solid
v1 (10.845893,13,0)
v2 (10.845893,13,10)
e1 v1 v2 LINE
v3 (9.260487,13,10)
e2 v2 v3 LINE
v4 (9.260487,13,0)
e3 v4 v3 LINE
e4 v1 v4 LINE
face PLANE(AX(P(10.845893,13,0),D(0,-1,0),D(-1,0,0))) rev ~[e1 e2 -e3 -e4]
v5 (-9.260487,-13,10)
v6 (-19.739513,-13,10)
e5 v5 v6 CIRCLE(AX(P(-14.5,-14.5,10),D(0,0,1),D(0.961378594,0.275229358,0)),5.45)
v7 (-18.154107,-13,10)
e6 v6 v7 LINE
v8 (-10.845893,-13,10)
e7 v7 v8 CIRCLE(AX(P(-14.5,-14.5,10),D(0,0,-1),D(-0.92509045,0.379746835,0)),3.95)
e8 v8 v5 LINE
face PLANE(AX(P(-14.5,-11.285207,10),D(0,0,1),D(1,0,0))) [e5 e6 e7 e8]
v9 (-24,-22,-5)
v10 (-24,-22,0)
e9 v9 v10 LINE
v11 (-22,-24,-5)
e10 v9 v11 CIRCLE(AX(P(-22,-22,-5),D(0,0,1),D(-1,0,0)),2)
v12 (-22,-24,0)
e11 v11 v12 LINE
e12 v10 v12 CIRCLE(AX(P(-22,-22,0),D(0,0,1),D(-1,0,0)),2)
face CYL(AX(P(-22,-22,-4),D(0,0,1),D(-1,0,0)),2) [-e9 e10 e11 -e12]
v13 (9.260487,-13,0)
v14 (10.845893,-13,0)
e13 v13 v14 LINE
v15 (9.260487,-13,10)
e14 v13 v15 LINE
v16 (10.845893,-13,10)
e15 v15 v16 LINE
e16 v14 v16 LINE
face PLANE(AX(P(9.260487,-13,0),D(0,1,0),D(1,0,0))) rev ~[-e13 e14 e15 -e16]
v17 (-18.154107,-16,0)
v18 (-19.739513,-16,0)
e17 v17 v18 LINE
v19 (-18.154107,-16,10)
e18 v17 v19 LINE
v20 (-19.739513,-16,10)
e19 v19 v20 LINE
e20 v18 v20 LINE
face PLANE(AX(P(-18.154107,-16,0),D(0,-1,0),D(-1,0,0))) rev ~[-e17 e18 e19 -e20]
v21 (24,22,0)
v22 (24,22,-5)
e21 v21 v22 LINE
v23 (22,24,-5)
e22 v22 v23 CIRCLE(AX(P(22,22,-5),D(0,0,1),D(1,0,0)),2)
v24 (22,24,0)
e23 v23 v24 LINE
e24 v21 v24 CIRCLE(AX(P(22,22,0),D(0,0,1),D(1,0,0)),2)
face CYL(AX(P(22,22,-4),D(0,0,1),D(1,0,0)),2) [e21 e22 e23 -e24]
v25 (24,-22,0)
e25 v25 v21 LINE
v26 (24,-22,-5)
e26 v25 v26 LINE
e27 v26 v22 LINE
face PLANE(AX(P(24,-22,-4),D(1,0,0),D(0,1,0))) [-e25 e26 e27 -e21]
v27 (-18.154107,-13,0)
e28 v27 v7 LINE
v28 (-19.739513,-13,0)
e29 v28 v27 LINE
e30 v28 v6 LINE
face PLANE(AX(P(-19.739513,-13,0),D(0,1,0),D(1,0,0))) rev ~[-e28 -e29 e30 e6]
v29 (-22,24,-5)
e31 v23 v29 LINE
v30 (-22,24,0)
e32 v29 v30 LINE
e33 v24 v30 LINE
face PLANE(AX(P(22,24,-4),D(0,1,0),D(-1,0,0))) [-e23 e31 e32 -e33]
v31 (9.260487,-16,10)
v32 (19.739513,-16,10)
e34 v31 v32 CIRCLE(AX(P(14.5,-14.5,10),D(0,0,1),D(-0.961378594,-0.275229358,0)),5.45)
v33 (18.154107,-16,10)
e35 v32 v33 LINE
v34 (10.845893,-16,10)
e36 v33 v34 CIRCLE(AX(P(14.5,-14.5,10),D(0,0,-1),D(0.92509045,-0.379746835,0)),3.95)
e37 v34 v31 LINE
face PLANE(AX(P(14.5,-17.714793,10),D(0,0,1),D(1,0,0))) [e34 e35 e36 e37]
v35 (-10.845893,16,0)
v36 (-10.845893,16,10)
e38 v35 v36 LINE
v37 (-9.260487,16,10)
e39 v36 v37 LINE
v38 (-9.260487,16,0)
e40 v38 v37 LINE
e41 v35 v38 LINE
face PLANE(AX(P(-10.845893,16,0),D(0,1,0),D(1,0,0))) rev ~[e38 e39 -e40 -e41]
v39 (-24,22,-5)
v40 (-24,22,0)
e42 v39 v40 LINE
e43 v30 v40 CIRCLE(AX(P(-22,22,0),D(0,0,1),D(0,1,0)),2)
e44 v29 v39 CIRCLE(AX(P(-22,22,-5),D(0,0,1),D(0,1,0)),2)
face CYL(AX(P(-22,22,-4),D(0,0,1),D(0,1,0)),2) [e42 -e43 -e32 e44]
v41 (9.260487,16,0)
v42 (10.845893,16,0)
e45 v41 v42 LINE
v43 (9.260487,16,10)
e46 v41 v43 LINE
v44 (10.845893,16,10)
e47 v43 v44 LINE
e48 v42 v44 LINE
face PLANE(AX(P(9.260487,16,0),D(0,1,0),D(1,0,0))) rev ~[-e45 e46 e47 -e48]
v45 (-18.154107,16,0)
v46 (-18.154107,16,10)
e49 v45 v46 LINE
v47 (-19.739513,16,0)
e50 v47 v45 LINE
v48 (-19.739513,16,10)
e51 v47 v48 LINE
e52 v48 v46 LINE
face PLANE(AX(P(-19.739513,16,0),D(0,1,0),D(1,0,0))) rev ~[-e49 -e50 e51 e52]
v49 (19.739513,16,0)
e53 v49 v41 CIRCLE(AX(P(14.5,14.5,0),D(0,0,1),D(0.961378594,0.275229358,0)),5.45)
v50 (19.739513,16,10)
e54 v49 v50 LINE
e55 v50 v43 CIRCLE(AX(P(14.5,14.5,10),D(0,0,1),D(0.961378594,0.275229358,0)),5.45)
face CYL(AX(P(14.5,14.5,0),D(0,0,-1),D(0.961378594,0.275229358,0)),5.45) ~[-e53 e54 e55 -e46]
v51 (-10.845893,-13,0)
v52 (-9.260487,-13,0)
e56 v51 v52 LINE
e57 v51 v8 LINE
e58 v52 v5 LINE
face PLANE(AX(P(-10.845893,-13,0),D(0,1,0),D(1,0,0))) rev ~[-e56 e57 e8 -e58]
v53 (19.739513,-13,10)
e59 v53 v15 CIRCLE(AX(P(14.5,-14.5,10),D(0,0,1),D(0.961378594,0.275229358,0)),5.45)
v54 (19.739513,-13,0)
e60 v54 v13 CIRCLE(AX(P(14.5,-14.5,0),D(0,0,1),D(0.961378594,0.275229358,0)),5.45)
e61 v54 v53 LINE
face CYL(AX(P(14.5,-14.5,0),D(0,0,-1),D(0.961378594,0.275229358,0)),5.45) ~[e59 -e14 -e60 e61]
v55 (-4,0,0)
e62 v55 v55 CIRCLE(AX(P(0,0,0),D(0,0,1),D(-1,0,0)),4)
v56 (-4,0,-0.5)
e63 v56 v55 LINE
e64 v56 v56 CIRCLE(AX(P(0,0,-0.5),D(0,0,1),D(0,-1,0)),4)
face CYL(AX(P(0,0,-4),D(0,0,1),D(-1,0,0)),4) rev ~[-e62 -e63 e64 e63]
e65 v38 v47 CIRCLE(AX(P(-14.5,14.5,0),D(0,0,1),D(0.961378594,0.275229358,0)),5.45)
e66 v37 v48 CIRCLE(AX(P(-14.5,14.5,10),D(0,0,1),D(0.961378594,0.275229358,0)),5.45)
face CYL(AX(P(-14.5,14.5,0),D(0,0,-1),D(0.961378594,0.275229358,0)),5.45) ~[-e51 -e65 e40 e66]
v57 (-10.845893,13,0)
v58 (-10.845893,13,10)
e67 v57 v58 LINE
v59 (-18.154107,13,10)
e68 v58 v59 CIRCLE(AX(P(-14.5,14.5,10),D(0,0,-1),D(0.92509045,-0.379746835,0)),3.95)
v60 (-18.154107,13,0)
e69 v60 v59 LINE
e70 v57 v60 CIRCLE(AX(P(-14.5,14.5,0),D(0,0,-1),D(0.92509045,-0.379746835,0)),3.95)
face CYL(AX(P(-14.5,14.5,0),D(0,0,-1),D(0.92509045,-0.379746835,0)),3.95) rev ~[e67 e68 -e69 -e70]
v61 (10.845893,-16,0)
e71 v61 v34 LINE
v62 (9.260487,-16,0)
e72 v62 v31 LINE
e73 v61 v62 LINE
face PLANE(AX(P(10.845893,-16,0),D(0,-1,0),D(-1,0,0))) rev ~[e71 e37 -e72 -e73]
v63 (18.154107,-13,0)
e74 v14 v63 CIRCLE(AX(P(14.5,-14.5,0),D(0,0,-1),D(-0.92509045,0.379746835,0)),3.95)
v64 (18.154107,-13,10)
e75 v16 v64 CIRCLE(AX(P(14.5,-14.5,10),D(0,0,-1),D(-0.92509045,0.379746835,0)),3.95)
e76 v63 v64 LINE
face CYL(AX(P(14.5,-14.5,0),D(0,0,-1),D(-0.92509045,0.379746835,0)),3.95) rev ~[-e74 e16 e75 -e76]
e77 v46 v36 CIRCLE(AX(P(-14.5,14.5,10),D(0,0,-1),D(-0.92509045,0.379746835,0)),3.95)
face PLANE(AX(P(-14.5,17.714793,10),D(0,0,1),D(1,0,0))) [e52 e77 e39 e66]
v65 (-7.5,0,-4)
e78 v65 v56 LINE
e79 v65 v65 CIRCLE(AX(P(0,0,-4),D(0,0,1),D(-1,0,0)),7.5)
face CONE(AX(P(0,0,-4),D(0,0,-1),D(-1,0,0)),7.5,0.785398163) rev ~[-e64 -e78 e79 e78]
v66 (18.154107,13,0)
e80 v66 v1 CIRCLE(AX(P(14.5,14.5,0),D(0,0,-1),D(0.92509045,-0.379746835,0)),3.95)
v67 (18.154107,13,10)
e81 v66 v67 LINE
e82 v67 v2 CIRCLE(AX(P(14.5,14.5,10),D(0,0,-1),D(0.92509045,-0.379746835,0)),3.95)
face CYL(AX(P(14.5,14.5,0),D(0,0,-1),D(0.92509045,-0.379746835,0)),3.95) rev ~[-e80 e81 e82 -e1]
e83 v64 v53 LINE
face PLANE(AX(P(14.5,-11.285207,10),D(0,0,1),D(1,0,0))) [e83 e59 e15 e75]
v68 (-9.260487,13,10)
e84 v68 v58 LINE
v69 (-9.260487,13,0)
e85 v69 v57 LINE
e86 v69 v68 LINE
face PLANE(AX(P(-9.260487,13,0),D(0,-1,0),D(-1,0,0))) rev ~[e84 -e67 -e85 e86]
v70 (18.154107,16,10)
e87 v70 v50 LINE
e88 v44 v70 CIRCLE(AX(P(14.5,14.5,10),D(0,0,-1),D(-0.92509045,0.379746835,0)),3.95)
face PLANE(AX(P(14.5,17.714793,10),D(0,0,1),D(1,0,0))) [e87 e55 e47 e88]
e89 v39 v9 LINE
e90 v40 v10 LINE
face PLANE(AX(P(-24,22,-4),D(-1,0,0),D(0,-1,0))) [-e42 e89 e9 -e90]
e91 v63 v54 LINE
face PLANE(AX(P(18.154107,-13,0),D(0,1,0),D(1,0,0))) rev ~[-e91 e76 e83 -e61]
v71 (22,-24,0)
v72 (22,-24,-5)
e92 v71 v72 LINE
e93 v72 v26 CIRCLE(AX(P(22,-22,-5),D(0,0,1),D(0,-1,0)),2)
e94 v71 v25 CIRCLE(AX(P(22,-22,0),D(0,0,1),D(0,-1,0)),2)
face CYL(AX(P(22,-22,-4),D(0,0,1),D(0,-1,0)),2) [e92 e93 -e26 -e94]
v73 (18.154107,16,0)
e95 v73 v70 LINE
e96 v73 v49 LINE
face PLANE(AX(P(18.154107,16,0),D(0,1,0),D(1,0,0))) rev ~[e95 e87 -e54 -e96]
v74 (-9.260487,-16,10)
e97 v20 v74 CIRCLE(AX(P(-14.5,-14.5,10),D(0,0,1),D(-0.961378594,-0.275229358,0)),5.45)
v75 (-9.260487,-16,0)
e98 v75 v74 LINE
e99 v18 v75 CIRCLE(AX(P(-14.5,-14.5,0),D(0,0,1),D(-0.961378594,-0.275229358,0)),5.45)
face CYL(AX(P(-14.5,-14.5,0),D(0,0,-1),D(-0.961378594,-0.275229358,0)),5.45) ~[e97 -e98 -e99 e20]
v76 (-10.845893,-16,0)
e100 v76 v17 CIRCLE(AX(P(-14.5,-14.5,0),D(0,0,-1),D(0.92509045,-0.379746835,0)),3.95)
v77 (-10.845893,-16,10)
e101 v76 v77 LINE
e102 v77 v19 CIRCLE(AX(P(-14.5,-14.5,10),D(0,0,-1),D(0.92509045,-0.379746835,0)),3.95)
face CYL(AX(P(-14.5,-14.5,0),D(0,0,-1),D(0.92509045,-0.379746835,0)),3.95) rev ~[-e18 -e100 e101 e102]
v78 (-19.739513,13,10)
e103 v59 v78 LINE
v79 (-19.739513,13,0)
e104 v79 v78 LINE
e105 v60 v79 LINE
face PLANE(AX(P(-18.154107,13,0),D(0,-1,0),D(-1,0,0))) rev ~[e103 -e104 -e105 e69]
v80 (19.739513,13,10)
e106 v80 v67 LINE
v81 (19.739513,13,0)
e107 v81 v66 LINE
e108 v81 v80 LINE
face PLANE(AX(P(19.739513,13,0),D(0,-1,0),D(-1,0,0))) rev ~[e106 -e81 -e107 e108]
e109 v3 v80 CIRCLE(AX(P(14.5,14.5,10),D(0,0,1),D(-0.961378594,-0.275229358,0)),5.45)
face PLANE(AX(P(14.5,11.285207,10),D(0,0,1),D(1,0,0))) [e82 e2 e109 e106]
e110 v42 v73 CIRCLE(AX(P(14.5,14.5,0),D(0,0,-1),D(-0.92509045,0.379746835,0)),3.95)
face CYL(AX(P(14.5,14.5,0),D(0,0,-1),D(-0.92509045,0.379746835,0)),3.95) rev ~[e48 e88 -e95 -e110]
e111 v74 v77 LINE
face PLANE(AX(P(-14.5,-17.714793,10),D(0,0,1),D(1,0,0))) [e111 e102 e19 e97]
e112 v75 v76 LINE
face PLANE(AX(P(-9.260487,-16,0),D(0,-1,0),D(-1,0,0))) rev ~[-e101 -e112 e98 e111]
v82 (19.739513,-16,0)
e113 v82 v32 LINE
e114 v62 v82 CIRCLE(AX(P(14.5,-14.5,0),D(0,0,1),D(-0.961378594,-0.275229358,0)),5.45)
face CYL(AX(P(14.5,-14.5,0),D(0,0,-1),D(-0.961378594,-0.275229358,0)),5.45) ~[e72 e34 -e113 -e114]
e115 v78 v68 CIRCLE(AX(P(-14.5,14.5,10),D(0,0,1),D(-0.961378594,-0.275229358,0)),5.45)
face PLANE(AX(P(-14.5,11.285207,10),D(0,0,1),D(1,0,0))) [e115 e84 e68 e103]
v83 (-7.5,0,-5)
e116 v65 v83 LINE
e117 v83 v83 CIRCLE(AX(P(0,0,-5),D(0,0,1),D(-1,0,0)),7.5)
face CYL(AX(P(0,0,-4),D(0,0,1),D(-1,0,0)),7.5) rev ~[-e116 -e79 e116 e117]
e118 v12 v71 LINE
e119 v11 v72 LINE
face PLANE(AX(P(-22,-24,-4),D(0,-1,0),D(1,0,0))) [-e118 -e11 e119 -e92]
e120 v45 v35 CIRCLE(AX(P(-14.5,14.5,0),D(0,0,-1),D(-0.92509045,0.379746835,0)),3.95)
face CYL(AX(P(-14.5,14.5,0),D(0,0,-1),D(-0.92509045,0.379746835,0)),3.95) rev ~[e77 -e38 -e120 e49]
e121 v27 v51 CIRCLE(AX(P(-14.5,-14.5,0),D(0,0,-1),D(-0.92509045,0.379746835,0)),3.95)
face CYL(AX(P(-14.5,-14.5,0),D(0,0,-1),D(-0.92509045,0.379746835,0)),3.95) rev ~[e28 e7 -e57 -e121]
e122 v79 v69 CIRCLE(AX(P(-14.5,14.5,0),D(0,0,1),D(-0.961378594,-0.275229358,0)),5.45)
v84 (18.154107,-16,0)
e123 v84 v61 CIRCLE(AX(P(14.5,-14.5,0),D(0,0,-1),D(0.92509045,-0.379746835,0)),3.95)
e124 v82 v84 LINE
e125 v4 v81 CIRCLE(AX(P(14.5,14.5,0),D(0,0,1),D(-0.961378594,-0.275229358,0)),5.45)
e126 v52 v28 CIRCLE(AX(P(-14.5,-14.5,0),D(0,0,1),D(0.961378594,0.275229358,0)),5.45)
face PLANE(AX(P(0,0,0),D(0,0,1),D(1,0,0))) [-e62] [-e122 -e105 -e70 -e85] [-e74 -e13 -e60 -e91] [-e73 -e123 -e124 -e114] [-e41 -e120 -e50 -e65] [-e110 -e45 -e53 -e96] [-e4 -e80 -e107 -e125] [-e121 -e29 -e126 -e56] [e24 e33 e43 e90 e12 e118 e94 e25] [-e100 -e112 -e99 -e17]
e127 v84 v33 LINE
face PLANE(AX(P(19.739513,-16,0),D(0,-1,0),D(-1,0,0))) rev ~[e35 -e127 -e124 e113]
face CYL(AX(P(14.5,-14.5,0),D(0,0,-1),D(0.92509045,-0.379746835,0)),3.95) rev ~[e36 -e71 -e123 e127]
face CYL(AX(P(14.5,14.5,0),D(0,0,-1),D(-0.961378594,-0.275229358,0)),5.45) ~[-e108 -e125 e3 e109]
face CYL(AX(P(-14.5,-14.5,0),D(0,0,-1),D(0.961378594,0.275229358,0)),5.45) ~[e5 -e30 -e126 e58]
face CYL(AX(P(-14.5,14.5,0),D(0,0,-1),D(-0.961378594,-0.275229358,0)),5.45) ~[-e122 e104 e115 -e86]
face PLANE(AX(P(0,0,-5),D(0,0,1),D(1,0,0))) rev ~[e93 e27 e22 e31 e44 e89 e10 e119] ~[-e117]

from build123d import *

# Parameters (mm, degrees)
F0_W           = 36
F0_H           = 36
F1_DEPTH       = 4
F3_DEPTH       = 10
F5_D           = 8
F5_CSINK_D     = 15
F5_CSINK_ANGLE = 90
F6_DEPTH       = 1


with BuildPart() as f1:
    # F0 (on Top) → F1 (new body)
    with BuildSketch(Plane.XY):
        with BuildLine():
            ThreePointArc((24, 22), (23.4142135624, 23.4142135624), (22, 24))
            Line((22, 24), (-22, 24))
            ThreePointArc((-22, 24), (-23.4142135624, 23.4142135624), (-24, 22))
            Line((-24, 22), (-24, -22))
            ThreePointArc((-24, -22), (-23.4142135624, -23.4142135624), (-22, -24))
            Line((-22, -24), (22, -24))
            ThreePointArc((22, -24), (23.4142135624, -23.4142135624), (24, -22))
            Line((24, -22), (24, 22))
        make_face()
        Rectangle(F0_W, F0_H, mode=Mode.SUBTRACT)
        Rectangle(F0_W, F0_H)
    extrude(amount=-F1_DEPTH)

    # F2 (on face) → F3 (join)
    with BuildSketch(Plane.XY):
        with BuildLine():
            Line((18.1541072781, 16), (19.7395133362, 16))
            ThreePointArc((19.7395133362, 16), (14.5, 19.95), (9.2604866638, 16))
            Line((9.2604866638, 16), (10.8458927219, 16))
            ThreePointArc((10.8458927219, 16), (14.5, 18.45), (18.1541072781, 16))
        make_face()
        with BuildLine():
            ThreePointArc((9.2604866638, 13), (14.5, 9.05), (19.7395133362, 13))
            Line((19.7395133362, 13), (18.1541072781, 13))
            ThreePointArc((18.1541072781, 13), (14.5, 10.55), (10.8458927219, 13))
            Line((10.8458927219, 13), (9.2604866638, 13))
        make_face()
        with BuildLine():
            Line((-10.8458927219, 16), (-9.2604866638, 16))
            ThreePointArc((-9.2604866638, 16), (-14.5, 19.95), (-19.7395133362, 16))
            Line((-19.7395133362, 16), (-18.1541072781, 16))
            ThreePointArc((-18.1541072781, 16), (-14.5, 18.45), (-10.8458927219, 16))
        make_face()
        with BuildLine():
            ThreePointArc((-19.7395133362, 13), (-14.5, 9.05), (-9.2604866638, 13))
            Line((-9.2604866638, 13), (-10.8458927219, 13))
            ThreePointArc((-10.8458927219, 13), (-14.5, 10.55), (-18.1541072781, 13))
            Line((-18.1541072781, 13), (-19.7395133362, 13))
        make_face()
        with BuildLine():
            Line((18.1541072781, -13), (19.7395133362, -13))
            ThreePointArc((19.7395133362, -13), (14.5, -9.05), (9.2604866638, -13))
            Line((9.2604866638, -13), (10.8458927219, -13))
            ThreePointArc((10.8458927219, -13), (14.5, -10.55), (18.1541072781, -13))
        make_face()
        with BuildLine():
            ThreePointArc((9.2604866638, -16), (14.5, -19.95), (19.7395133362, -16))
            Line((19.7395133362, -16), (18.1541072781, -16))
            ThreePointArc((18.1541072781, -16), (14.5, -18.45), (10.8458927219, -16))
            Line((10.8458927219, -16), (9.2604866638, -16))
        make_face()
        with BuildLine():
            ThreePointArc((-9.2604866638, -13), (-14.5, -9.05), (-19.7395133362, -13))
            Line((-19.7395133362, -13), (-18.1541072781, -13))
            ThreePointArc((-18.1541072781, -13), (-14.5, -10.55), (-10.8458927219, -13))
            Line((-10.8458927219, -13), (-9.2604866638, -13))
        make_face()
        with BuildLine():
            Line((-18.1541072781, -16), (-19.7395133362, -16))
            ThreePointArc((-19.7395133362, -16), (-14.5, -19.95), (-9.2604866638, -16))
            Line((-9.2604866638, -16), (-10.8458927219, -16))
            ThreePointArc((-10.8458927219, -16), (-14.5, -18.45), (-18.1541072781, -16))
        make_face()
    extrude(amount=F3_DEPTH)

    # F5 (through all)
    with Locations(Plane(origin=(0, 0, -4), x_dir=(1, 0, 0), z_dir=(0, 0, -1))):
        with Locations((0, 0)):
            CounterSinkHole(F5_D / 2, F5_CSINK_D / 2, counter_sink_angle=F5_CSINK_ANGLE)

    # F6 (add): a face of the model
    f6_faces = [f1.faces().sort_by_distance(p)[0] for p in [
        (22.9342135624, 22.9342135624, -4),
    ]]
    extrude(f6_faces, amount=F6_DEPTH)


solid = f1.part
